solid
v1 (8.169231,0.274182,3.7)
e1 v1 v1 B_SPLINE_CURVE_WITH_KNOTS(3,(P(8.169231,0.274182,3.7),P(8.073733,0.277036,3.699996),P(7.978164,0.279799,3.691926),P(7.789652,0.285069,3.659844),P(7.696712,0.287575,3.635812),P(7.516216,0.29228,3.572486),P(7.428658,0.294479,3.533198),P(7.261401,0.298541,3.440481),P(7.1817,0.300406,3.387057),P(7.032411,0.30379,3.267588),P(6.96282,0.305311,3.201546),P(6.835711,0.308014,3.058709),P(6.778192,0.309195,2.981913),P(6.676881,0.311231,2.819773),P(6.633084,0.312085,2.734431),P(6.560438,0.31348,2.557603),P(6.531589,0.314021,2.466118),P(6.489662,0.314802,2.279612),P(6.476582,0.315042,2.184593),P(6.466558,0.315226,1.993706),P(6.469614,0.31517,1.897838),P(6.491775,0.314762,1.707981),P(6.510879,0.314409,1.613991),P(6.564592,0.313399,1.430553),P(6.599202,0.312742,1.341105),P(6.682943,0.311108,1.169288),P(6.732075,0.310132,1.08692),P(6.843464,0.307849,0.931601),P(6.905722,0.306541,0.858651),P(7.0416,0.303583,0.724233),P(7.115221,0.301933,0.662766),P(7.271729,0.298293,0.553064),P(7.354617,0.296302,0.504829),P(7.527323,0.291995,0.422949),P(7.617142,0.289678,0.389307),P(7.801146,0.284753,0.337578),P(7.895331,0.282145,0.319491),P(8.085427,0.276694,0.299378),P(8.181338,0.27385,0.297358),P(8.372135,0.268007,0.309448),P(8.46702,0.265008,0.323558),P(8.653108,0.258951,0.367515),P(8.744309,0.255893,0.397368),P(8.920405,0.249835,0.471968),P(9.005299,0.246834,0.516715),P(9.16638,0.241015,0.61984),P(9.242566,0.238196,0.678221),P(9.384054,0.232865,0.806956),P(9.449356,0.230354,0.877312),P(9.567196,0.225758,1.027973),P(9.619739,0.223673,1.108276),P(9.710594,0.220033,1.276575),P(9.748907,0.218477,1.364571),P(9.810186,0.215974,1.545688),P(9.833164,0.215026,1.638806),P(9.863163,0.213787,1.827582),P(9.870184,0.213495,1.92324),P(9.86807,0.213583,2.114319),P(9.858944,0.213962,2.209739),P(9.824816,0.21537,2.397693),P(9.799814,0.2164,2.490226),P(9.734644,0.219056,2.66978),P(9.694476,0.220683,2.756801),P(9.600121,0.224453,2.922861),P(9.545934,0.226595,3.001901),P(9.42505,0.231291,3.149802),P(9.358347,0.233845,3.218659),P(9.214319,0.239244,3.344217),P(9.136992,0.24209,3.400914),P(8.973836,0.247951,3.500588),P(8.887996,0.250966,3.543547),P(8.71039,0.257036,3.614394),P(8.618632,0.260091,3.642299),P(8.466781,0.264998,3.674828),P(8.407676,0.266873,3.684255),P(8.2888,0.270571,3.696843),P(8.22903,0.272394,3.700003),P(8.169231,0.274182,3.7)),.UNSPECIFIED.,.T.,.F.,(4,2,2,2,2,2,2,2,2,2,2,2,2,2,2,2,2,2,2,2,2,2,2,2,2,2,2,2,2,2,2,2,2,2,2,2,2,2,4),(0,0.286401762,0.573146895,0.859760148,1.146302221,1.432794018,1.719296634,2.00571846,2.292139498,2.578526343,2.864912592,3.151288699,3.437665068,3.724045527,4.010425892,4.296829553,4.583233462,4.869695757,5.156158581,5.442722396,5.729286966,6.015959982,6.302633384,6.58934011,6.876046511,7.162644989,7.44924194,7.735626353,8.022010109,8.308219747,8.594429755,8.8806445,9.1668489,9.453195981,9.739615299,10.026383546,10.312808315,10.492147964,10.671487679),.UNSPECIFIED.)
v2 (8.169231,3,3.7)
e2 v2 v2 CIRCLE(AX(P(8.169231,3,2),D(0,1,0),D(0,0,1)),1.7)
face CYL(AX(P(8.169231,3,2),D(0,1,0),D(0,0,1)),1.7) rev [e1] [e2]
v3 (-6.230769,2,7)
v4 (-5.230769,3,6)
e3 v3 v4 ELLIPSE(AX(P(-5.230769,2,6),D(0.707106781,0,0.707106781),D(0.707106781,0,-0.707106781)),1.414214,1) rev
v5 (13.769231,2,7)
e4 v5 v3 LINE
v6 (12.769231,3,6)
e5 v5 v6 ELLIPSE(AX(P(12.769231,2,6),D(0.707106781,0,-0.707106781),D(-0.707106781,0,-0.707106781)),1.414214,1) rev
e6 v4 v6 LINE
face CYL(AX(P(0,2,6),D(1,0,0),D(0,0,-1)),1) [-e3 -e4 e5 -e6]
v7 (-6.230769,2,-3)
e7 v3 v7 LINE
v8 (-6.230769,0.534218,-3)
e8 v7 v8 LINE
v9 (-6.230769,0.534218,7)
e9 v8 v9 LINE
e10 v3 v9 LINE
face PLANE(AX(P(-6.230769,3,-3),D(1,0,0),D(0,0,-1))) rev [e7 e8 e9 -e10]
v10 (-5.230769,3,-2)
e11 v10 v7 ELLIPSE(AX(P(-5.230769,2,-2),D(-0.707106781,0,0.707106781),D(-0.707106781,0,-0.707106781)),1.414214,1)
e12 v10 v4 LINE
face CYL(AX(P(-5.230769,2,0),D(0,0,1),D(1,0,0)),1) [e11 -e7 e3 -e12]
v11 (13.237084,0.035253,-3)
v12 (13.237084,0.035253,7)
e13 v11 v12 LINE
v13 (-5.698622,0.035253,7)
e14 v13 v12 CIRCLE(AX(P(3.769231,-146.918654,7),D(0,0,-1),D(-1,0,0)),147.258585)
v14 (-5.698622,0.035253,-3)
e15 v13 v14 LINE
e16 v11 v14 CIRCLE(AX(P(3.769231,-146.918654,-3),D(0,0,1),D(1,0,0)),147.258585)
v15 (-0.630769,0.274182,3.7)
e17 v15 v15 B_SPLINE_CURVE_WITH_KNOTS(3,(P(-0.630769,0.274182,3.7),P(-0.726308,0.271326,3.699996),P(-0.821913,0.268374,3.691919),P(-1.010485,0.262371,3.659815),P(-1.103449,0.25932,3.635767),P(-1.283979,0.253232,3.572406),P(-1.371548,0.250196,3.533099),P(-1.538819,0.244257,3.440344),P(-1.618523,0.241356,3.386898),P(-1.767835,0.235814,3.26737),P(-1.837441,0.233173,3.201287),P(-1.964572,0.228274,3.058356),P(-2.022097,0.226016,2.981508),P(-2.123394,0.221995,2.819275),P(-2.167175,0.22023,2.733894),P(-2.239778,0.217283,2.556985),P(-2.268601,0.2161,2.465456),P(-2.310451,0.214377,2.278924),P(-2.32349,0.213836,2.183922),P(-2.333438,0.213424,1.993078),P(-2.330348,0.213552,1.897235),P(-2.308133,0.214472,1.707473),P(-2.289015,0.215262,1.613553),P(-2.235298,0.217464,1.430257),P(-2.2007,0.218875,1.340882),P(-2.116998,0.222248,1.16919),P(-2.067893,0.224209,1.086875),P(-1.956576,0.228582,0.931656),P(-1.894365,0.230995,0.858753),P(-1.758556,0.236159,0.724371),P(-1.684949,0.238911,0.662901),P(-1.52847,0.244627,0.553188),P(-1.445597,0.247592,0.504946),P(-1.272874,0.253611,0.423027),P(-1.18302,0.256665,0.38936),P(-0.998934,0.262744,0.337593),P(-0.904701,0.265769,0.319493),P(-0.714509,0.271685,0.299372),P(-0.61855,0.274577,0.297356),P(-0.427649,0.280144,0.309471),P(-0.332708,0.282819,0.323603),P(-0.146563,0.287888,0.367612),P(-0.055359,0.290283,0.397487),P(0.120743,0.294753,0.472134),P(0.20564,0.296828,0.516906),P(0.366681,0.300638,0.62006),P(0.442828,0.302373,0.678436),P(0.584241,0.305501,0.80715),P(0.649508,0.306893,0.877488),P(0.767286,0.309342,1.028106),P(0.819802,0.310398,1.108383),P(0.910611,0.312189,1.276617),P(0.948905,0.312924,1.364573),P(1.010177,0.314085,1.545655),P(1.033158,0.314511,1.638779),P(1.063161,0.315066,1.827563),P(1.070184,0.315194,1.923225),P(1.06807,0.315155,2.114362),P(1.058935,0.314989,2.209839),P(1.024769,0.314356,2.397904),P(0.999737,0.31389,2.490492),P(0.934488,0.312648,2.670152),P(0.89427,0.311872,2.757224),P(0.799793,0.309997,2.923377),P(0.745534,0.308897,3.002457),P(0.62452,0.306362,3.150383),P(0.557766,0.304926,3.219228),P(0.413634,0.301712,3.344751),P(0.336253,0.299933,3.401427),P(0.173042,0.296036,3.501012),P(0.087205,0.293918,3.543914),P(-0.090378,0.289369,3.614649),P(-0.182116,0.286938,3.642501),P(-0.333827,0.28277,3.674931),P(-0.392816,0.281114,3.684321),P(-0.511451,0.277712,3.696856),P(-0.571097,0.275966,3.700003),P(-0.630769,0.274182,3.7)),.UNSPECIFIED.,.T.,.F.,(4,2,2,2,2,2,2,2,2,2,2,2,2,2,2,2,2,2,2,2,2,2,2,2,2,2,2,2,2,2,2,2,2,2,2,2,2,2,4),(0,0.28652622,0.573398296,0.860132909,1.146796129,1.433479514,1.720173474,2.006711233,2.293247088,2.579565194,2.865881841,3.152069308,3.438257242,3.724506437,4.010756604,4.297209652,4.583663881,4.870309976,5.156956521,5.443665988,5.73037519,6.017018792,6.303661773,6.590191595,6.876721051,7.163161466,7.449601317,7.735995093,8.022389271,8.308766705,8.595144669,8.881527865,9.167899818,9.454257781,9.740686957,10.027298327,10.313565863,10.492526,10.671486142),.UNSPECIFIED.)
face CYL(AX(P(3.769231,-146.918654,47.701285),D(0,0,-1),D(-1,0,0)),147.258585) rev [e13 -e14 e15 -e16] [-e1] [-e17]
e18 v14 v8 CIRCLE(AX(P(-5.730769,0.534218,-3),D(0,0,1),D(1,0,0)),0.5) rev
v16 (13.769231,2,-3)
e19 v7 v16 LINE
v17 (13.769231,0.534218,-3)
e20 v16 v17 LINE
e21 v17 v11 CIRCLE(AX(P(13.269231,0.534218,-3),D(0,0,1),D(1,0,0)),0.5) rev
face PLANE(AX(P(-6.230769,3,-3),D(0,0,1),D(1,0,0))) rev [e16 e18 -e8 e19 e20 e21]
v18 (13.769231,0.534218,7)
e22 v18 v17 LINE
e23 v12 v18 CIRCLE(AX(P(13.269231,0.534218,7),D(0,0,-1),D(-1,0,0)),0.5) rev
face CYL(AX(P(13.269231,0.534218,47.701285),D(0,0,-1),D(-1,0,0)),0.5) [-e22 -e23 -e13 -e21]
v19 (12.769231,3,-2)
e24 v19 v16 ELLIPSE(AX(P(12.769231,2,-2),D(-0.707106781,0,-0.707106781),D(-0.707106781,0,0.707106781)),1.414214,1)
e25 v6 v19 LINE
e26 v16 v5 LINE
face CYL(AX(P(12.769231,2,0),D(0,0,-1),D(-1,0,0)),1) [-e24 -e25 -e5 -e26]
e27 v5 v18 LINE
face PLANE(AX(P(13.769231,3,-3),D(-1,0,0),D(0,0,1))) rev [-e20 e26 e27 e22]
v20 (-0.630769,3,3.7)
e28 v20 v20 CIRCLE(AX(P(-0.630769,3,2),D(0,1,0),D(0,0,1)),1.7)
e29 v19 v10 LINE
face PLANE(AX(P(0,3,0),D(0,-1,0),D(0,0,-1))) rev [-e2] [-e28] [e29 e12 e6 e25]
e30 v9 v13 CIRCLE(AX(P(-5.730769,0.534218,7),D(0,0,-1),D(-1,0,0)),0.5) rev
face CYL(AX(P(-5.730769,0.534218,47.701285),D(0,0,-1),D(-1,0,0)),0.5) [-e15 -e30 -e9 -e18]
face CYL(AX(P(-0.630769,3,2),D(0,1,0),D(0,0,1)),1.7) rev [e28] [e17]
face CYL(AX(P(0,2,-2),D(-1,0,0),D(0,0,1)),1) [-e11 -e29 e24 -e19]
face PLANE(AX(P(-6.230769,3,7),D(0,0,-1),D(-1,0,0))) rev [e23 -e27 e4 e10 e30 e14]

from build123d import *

# Parameters (mm, degrees)
SKETCH1_W            = 20
SKETCH1_H            = 10
BOSS_EXTRUDE1_DEPTH  = 3
M3_CLEARANCE_HOLE1_D = 3.4
FILLET3_R            = 1
CUT_EXTRUDE4_START   = -10
CUT_EXTRUDE4_DEPTH   = 10
FILLET4_R            = 0.5


# Read off the part's stored shape, not the designer's step: Cut-Extrude4
with BuildPart() as part:
    # Sketch1 → Boss-Extrude1 (new body)
    with BuildSketch(Plane(origin=(0, 0, 0), x_dir=(1, 0, 0), z_dir=(0, 1, 0))):
        with Locations((3.769230769, -2)):
            Rectangle(SKETCH1_W, SKETCH1_H)
    extrude(amount=BOSS_EXTRUDE1_DEPTH)

    # M3 Clearance Hole1 (through all)
    with Locations(Plane(origin=(0, 3, 0), x_dir=(1, 0, 0), z_dir=(0, 1, 0))):
        with Locations((-0.630769231, -2), (8.169230769, -2)):
            Hole(M3_CLEARANCE_HOLE1_D / 2)

    # Fillet3
    fillet3_edges = [part.edges().sort_by_distance(p)[0] for p in [
        (3.769230769, 3, 7),
        (13.769230769, 3, 2),
        (3.769230769, 3, -3),
        (-6.230769231, 3, 2),
    ]]
    fillet(fillet3_edges, radius=FILLET3_R)

    # Cut-Extrude4 outline → Cut-Extrude4 (cut)
    with BuildSketch(Plane.XY.offset(7).offset(CUT_EXTRUDE4_START)):
        with BuildLine():
            ThreePointArc((13.769230769, 0), (3.769230769, 0.339931125), (-6.230769231, 0))
            Line((-6.230769231, 0), (13.769230769, 0))
        make_face()
    extrude(amount=CUT_EXTRUDE4_DEPTH, mode=Mode.SUBTRACT)

    # Fillet4
    fillet4_edges = [part.edges().sort_by_distance(p)[0] for p in [
        (13.769230769, 0, 2),
        (-6.230769231, 0, 2),
    ]]
    fillet(fillet4_edges, radius=FILLET4_R)


solid = part.part
